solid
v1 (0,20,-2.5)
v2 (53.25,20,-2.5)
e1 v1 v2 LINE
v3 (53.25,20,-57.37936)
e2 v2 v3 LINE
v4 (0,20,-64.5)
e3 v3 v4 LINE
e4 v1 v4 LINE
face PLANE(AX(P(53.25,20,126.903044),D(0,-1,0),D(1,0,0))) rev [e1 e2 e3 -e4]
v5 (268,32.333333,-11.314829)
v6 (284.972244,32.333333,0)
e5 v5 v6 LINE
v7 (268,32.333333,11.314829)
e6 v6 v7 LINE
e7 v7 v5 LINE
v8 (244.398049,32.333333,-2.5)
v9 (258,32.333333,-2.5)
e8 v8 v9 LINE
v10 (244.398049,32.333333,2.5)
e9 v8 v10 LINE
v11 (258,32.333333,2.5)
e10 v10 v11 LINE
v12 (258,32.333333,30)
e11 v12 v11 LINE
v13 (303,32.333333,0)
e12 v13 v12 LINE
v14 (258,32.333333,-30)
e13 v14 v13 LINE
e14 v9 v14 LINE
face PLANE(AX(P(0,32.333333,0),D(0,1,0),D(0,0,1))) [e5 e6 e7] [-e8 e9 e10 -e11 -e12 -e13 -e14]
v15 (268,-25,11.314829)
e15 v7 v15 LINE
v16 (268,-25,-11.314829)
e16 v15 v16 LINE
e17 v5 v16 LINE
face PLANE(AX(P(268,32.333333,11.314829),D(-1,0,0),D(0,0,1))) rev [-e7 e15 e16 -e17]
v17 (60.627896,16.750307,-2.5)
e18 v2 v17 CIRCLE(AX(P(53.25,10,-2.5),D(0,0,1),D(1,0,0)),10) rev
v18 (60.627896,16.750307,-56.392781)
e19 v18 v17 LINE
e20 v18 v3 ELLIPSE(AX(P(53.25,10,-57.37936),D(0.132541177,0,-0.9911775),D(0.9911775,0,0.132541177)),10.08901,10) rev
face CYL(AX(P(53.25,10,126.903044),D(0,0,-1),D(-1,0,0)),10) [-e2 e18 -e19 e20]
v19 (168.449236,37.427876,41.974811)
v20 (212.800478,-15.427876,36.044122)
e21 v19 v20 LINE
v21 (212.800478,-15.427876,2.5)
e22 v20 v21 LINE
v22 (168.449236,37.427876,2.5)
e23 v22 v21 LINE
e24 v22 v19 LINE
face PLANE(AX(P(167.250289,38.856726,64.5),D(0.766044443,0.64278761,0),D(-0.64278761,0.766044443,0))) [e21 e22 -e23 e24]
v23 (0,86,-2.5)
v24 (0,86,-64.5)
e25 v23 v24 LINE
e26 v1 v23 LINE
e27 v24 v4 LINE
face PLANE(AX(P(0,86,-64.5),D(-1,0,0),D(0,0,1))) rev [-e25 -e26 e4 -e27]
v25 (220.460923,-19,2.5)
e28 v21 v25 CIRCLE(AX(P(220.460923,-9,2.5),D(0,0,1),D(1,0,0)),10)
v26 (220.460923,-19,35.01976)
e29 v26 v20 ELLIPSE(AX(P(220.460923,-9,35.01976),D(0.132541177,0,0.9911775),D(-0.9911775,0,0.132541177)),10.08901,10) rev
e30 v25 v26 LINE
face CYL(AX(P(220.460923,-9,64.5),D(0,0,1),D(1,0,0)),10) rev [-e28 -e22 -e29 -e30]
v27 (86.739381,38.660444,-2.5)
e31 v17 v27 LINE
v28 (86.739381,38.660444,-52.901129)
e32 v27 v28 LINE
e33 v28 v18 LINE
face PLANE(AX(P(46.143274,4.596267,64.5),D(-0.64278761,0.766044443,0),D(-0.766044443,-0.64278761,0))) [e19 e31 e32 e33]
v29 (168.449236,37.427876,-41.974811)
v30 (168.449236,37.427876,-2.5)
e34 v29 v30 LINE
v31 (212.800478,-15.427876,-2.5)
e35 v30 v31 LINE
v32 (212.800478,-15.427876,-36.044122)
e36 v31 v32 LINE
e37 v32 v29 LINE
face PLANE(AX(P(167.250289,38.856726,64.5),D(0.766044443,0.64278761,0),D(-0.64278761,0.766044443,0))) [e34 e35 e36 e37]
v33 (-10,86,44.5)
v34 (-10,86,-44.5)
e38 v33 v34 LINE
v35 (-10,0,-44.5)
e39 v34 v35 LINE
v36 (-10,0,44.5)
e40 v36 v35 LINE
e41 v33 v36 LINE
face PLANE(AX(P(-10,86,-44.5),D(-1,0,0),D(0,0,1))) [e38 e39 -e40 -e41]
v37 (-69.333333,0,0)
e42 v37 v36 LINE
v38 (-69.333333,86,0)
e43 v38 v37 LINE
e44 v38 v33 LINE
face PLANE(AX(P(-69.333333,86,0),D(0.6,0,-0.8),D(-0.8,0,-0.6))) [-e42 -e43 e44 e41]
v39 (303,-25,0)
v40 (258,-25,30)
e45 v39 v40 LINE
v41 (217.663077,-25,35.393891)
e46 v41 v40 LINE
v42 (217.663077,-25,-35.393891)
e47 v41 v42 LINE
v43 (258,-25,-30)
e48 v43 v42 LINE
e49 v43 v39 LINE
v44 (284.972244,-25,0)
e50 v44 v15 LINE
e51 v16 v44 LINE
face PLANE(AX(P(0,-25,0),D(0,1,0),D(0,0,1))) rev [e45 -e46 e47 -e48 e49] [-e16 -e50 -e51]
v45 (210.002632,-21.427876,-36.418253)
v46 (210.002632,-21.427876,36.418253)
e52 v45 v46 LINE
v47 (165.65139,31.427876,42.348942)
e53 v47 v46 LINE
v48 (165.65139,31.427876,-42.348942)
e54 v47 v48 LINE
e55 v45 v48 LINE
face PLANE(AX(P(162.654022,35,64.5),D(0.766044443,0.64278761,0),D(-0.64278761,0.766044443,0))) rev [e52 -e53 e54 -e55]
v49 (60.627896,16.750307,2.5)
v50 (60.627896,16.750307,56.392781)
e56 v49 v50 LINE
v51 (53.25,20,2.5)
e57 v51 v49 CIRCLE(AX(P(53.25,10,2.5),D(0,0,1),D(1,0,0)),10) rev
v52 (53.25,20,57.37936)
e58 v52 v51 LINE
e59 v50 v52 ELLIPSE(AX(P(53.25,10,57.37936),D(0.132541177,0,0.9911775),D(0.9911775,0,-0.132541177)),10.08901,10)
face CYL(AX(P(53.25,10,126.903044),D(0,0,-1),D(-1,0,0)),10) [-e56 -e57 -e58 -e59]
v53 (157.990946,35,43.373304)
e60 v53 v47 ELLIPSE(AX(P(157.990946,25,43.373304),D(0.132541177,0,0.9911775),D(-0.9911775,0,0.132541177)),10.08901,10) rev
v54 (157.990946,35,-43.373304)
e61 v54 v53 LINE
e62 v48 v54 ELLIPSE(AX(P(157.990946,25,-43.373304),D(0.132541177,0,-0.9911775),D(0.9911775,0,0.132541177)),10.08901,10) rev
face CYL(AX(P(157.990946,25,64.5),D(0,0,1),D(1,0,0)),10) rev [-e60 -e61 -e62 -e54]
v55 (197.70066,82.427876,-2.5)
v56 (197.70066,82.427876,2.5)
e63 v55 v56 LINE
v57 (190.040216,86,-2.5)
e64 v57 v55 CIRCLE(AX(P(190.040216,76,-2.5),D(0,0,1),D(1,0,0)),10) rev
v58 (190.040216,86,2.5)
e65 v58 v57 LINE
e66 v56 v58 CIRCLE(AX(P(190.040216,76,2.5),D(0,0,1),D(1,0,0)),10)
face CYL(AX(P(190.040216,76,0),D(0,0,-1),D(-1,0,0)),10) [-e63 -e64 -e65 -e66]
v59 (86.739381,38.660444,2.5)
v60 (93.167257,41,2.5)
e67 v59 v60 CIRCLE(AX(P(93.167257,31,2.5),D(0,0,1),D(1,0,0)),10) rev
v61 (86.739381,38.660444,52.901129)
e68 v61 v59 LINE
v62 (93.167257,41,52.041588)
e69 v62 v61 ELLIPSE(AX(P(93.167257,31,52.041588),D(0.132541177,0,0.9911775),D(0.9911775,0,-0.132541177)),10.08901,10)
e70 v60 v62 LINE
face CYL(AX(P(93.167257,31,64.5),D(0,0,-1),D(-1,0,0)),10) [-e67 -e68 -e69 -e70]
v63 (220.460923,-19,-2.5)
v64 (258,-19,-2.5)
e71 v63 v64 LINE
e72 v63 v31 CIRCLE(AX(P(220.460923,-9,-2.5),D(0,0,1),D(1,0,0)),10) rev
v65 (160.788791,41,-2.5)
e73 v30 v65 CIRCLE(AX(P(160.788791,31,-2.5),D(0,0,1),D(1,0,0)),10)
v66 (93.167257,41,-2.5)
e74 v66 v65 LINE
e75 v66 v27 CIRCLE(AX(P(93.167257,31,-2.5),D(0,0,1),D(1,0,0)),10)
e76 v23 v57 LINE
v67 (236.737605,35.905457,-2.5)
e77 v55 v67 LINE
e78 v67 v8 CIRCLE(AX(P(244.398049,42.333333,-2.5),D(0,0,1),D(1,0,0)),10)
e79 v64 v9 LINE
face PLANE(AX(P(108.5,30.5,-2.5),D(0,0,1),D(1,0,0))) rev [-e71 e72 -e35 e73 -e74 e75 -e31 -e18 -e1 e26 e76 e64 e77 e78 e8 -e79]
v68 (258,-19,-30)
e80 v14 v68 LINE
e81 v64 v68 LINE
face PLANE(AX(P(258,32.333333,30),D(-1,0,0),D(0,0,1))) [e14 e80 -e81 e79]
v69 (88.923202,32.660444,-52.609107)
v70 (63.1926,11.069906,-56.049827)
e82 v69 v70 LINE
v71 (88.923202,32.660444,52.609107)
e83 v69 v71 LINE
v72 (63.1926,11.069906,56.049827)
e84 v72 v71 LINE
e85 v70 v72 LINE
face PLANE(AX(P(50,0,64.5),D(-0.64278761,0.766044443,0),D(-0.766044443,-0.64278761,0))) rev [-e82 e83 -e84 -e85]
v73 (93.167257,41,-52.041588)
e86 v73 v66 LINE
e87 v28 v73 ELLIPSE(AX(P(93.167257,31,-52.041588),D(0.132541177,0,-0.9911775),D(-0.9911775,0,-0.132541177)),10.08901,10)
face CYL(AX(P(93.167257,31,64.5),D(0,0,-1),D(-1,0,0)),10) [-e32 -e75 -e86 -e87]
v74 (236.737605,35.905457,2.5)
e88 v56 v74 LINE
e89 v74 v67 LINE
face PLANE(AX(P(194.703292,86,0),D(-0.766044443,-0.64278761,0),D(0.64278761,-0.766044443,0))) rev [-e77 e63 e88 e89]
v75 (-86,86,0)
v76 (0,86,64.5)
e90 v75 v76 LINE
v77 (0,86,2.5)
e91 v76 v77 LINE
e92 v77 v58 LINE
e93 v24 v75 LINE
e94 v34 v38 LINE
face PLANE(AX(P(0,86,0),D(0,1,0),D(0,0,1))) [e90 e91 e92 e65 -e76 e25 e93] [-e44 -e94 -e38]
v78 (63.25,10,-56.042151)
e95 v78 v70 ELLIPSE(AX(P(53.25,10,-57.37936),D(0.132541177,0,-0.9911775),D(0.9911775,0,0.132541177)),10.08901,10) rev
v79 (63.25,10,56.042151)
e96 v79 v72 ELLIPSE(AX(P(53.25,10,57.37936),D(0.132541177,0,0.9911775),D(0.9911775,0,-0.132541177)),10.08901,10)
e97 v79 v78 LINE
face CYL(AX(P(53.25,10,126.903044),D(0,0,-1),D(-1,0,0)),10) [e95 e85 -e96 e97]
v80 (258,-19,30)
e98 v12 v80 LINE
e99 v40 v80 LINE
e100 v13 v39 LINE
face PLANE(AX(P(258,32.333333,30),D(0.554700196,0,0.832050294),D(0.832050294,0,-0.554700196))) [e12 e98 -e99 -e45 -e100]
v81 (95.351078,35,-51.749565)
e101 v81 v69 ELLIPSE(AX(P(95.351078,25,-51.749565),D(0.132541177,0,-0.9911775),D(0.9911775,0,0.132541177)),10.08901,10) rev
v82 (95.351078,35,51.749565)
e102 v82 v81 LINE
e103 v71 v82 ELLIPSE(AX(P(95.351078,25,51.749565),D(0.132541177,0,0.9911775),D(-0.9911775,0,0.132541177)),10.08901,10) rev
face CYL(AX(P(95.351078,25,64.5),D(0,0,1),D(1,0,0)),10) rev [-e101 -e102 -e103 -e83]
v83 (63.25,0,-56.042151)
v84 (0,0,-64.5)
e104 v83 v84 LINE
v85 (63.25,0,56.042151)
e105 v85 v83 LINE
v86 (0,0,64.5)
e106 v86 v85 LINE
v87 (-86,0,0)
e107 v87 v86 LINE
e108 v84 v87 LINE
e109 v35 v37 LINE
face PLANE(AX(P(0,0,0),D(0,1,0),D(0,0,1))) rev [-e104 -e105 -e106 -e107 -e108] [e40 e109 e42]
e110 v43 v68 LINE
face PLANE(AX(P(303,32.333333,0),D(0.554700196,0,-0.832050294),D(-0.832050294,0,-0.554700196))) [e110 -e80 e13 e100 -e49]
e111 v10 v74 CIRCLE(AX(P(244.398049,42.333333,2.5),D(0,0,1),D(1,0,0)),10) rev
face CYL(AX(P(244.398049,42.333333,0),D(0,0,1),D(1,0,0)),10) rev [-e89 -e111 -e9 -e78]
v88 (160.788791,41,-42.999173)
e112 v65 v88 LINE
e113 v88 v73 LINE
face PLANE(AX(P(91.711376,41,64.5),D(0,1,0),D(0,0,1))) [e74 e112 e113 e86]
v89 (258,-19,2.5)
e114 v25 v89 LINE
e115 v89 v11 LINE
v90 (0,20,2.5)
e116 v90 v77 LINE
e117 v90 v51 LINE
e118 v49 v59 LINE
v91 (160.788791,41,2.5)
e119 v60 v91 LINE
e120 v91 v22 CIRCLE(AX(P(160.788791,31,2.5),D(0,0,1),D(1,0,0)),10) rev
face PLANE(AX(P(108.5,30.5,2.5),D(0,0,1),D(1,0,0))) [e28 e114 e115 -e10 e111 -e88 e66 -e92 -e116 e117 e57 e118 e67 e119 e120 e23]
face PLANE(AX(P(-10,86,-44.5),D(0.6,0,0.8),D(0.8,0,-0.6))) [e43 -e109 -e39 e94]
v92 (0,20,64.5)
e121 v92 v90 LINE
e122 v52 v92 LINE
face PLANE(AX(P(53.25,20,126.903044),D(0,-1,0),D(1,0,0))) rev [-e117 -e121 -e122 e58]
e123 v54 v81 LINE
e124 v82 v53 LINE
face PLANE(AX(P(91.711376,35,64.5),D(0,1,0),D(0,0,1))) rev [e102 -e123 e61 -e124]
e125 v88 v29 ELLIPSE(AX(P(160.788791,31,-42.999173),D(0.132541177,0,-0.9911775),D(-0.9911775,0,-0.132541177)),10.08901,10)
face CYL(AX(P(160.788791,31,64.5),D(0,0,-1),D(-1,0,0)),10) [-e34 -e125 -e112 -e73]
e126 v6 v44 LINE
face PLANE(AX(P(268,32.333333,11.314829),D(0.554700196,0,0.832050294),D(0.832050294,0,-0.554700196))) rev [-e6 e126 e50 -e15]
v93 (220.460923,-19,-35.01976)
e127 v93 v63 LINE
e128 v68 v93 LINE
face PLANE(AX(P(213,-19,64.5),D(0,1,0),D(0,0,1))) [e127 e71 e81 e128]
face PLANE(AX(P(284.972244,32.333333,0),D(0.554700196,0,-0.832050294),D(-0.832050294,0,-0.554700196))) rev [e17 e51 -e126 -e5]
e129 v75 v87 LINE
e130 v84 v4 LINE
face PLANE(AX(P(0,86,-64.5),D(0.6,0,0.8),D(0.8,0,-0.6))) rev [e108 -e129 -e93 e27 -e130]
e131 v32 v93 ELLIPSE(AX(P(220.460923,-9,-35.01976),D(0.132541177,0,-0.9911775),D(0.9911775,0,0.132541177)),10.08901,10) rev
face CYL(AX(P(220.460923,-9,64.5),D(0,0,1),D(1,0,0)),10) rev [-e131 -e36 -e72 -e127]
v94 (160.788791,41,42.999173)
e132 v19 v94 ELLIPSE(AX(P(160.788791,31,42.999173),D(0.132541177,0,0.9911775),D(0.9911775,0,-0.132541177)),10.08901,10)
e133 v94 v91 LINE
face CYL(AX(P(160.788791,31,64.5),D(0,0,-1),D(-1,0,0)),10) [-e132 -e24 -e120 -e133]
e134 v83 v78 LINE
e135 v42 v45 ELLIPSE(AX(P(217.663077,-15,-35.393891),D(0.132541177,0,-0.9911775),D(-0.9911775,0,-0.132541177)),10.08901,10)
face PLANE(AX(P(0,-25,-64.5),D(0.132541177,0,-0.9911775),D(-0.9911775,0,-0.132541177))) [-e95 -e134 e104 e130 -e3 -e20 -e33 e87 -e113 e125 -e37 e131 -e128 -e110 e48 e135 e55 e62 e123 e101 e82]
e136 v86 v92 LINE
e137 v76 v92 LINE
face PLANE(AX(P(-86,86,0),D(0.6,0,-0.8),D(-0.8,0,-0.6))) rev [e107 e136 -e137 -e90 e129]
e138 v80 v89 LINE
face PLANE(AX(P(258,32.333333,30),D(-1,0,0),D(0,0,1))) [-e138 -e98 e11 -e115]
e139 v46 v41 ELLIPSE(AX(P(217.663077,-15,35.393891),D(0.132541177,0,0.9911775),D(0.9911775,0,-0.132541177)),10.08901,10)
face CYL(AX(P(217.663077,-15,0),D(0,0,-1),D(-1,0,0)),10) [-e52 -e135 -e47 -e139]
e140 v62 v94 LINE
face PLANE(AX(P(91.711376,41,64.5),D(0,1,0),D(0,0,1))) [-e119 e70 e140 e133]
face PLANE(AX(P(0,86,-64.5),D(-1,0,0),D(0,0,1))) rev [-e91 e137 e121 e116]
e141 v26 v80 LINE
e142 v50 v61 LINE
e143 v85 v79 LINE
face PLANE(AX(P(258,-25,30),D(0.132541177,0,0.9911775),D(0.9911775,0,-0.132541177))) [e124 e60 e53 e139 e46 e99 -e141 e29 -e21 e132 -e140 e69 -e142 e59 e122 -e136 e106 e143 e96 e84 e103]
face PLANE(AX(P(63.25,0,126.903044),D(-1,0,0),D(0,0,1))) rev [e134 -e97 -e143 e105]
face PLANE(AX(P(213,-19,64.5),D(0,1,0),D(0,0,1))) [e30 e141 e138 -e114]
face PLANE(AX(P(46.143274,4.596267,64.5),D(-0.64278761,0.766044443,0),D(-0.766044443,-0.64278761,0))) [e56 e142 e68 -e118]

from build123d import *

# Parameters (mm, degrees)
EXTRUDE_1_DEPTH             = 86
EXTRUDE_1_2_DEPTH           = 64.5
EXTRUDE_1_2_DEPTH_BACK      = 64.5
EXTRUDE_5_DEPTH             = 57.333333333
CUT_EXTRUDE_5_DEPTH         = 328.099755426
CUT_EXTRUDE_5_DEPTH_BACK    = 328.099755426
SKETCH_13_OUTSIDE_W         = 475.92
SKETCH_13_OUTSIDE_H         = 215.92
RIB_START                   = -2.5
RIB_2_DEPTH                 = 5
FILLET_1_R                  = 10
CUT_EXTRUDE_3_DEPTH         = 322.504665596
CUT_EXTRUDE_3_DEPTH_BACK    = 322.504665596
SKETCH_10_R                 = 5
CUT_EXTRUDE_4_DEPTH         = 322.504665596
CUT_EXTRUDE_4_DEPTH_BACK    = 322.504665596
SKETCH_11_R                 = 5
EXTRUDE_6_REACH             = 323.505
EXTRUDE_6_DIRECTION_2_REACH = 323.505


# Read off the part's stored shape, not the designer's step: 보강대2
with BuildPart() as part:
    # 스케치1 → Extrude 1 (new body)
    with BuildSketch(Plane(origin=(0, 0, 0), x_dir=(1, 0, 0), z_dir=(0, 1, 0))):
        Polygon((0, 64.5), (0, -64.5), (-86, 0), align=None)
        Polygon((-10, 44.5), (-69.333333333, 0), (-10, -44.5), align=None, mode=Mode.SUBTRACT)
    extrude(amount=EXTRUDE_1_DEPTH)


with BuildPart() as body_2:
    # 스케치3 → Extrude 1 2 (new, two sides: drawn at the far end of the back side and taken through both)
    with BuildSketch(Plane.XY.offset(-EXTRUDE_1_2_DEPTH_BACK)):
        Polygon((0, 0), (50, 0), (91.711375741, 35), (162.654022129, 35), (213, -25), (258, -25), (258, -19), (215.797845949, -19), (165.451868078, 41), (89.527554335, 41), (47.816178594, 6), (0, 6), align=None)
    extrude(amount=EXTRUDE_1_2_DEPTH + EXTRUDE_1_2_DEPTH_BACK)

    # 스케치13 outside → 컷-돌출5 (cut, two sides: drawn at the far end of the back side and taken through both)
    with BuildSketch(Plane(origin=(0, -19, 0), x_dir=(1, 0, 0), z_dir=(0, 1, 0)).offset(-CUT_EXTRUDE_5_DEPTH_BACK)):
        with Locations((108.5, 0)):
            Rectangle(SKETCH_13_OUTSIDE_W, SKETCH_13_OUTSIDE_H)
        Polygon((0, 64.5), (258, 30), (258, -30), (0, -64.5), align=None, mode=Mode.SUBTRACT)
    extrude(amount=CUT_EXTRUDE_5_DEPTH + CUT_EXTRUDE_5_DEPTH_BACK, mode=Mode.SUBTRACT)


with BuildPart() as body_3:
    # 스케치12 → 보스-돌출5 (new body)
    with BuildSketch(Plane.XZ.offset(25)):
        Polygon((258, 30), (258, -30), (303, 0), align=None)
        Polygon((268, 11.314829082), (284.972243623, 0), (268, -11.314829082), align=None, mode=Mode.SUBTRACT)
    extrude(amount=-EXTRUDE_5_DEPTH)


with BuildPart() as part_1:
    add(part.part)

    # Combine 1: union body 3, body 2
    add(body_3.part)
    add(body_2.part)

    # 보강대2 outline → 보강대2 (add)
    with BuildSketch(Plane.XY.offset(RIB_START)):
        Polygon((239.734972401, 32.333333333), (194.703292194, 86), (0, 86), (0, 6), (47.816178594, 6), (89.527554335, 41), (165.451868078, 41), (215.797845949, -19), (258, -19), (258, 32.333333333), align=None)
    extrude(amount=RIB_2_DEPTH)

    # 필렛1
    fillet_1_edges = [part_1.edges().sort_by_distance(p)[0] for p in [
        (194.703292194, 86, 0),
        (213, -25, 0),
        (215.797845949, -19, 19.071655649),
        (165.451868078, 41, 22.437811146),
        (89.527554335, 41, 27.514146076),
        (47.816178594, 6, 30.302988059),
        (50, 0, 0),
        (91.711375741, 35, 0),
        (162.654022129, 35, 0),
        (47.816178594, 6, -30.302988059),
        (89.527554335, 41, -27.514146076),
        (165.451868078, 41, -22.437811146),
        (215.797845949, -19, -19.071655649),
        (239.734972401, 32.333333333, 0),
    ]]
    fillet(fillet_1_edges, radius=FILLET_1_R)

    # 스케치10 → 컷-돌출3 (cut, two sides: drawn at the far end of the back side and taken through both)
    with BuildSketch(Plane.XY.offset(-CUT_EXTRUDE_3_DEPTH_BACK)):
        with Locations((158, -20)):
            Circle(SKETCH_10_R)
    extrude(amount=CUT_EXTRUDE_3_DEPTH + CUT_EXTRUDE_3_DEPTH_BACK, mode=Mode.SUBTRACT)

    # 스케치11 → 컷-돌출4 (cut, two sides: drawn at the far end of the back side and taken through both)
    with BuildSketch(Plane.XY.offset(-CUT_EXTRUDE_4_DEPTH_BACK)):
        with Locations(Location((53.25, 10, 0), (0, 0, 44.917604926))):
            Circle(SKETCH_11_R)
    extrude(amount=CUT_EXTRUDE_4_DEPTH + CUT_EXTRUDE_4_DEPTH_BACK, mode=Mode.SUBTRACT)

    # 보스-돌출6: up to this plane
    extrude_6_end = Plane(origin=(258, -25, 30), z_dir=(0.13254117731278448, 0, 0.9911774999043013))
    # 스케치8 → 보스-돌출6 (add, up to the surface)
    with BuildSketch(Plane.XY, mode=Mode.PRIVATE) as extrude_6_sk1:
        with BuildLine():
            Line((63.25, 0), (0, 0))
            Line((0, 0), (0, 20))
            Line((0, 20), (53.25, 20))
            ThreePointArc((53.25, 20), (60.321067812, 17.071067812), (63.25, 10))
            Line((63.25, 10), (63.25, 0))
        make_face()
    extrude_6_tool1 = split(extrude(extrude_6_sk1.sketch, amount=EXTRUDE_6_REACH, mode=Mode.PRIVATE), bisect_by=extrude_6_end, keep=Keep.BOTH, mode=Mode.PRIVATE)
    add(extrude_6_tool1.solids().sort_by_distance((31.117784, 9.865974, 0))[0])

    # 보스-돌출6 direction 2: up to this plane
    extrude_6_direction_2_end = Plane(origin=(0, -25, -64.5), z_dir=(0.13254117731278448, 0, -0.9911774999043013))
    # 스케치8 → 보스-돌출6 direction 2 (add, up to the surface)
    with BuildSketch(Plane.XY, mode=Mode.PRIVATE) as extrude_6_direction_2_sk1:
        with BuildLine():
            Line((63.25, 0), (0, 0))
            Line((0, 0), (0, 20))
            Line((0, 20), (53.25, 20))
            ThreePointArc((53.25, 20), (60.321067812, 17.071067812), (63.25, 10))
            Line((63.25, 10), (63.25, 0))
        make_face()
    extrude_6_direction_2_tool1 = split(extrude(extrude_6_direction_2_sk1.sketch, amount=-EXTRUDE_6_DIRECTION_2_REACH, mode=Mode.PRIVATE), bisect_by=extrude_6_direction_2_end, keep=Keep.BOTH, mode=Mode.PRIVATE)
    add(extrude_6_direction_2_tool1.solids().sort_by_distance((31.117784, 9.865974, 0))[0])


solid = part_1.part
